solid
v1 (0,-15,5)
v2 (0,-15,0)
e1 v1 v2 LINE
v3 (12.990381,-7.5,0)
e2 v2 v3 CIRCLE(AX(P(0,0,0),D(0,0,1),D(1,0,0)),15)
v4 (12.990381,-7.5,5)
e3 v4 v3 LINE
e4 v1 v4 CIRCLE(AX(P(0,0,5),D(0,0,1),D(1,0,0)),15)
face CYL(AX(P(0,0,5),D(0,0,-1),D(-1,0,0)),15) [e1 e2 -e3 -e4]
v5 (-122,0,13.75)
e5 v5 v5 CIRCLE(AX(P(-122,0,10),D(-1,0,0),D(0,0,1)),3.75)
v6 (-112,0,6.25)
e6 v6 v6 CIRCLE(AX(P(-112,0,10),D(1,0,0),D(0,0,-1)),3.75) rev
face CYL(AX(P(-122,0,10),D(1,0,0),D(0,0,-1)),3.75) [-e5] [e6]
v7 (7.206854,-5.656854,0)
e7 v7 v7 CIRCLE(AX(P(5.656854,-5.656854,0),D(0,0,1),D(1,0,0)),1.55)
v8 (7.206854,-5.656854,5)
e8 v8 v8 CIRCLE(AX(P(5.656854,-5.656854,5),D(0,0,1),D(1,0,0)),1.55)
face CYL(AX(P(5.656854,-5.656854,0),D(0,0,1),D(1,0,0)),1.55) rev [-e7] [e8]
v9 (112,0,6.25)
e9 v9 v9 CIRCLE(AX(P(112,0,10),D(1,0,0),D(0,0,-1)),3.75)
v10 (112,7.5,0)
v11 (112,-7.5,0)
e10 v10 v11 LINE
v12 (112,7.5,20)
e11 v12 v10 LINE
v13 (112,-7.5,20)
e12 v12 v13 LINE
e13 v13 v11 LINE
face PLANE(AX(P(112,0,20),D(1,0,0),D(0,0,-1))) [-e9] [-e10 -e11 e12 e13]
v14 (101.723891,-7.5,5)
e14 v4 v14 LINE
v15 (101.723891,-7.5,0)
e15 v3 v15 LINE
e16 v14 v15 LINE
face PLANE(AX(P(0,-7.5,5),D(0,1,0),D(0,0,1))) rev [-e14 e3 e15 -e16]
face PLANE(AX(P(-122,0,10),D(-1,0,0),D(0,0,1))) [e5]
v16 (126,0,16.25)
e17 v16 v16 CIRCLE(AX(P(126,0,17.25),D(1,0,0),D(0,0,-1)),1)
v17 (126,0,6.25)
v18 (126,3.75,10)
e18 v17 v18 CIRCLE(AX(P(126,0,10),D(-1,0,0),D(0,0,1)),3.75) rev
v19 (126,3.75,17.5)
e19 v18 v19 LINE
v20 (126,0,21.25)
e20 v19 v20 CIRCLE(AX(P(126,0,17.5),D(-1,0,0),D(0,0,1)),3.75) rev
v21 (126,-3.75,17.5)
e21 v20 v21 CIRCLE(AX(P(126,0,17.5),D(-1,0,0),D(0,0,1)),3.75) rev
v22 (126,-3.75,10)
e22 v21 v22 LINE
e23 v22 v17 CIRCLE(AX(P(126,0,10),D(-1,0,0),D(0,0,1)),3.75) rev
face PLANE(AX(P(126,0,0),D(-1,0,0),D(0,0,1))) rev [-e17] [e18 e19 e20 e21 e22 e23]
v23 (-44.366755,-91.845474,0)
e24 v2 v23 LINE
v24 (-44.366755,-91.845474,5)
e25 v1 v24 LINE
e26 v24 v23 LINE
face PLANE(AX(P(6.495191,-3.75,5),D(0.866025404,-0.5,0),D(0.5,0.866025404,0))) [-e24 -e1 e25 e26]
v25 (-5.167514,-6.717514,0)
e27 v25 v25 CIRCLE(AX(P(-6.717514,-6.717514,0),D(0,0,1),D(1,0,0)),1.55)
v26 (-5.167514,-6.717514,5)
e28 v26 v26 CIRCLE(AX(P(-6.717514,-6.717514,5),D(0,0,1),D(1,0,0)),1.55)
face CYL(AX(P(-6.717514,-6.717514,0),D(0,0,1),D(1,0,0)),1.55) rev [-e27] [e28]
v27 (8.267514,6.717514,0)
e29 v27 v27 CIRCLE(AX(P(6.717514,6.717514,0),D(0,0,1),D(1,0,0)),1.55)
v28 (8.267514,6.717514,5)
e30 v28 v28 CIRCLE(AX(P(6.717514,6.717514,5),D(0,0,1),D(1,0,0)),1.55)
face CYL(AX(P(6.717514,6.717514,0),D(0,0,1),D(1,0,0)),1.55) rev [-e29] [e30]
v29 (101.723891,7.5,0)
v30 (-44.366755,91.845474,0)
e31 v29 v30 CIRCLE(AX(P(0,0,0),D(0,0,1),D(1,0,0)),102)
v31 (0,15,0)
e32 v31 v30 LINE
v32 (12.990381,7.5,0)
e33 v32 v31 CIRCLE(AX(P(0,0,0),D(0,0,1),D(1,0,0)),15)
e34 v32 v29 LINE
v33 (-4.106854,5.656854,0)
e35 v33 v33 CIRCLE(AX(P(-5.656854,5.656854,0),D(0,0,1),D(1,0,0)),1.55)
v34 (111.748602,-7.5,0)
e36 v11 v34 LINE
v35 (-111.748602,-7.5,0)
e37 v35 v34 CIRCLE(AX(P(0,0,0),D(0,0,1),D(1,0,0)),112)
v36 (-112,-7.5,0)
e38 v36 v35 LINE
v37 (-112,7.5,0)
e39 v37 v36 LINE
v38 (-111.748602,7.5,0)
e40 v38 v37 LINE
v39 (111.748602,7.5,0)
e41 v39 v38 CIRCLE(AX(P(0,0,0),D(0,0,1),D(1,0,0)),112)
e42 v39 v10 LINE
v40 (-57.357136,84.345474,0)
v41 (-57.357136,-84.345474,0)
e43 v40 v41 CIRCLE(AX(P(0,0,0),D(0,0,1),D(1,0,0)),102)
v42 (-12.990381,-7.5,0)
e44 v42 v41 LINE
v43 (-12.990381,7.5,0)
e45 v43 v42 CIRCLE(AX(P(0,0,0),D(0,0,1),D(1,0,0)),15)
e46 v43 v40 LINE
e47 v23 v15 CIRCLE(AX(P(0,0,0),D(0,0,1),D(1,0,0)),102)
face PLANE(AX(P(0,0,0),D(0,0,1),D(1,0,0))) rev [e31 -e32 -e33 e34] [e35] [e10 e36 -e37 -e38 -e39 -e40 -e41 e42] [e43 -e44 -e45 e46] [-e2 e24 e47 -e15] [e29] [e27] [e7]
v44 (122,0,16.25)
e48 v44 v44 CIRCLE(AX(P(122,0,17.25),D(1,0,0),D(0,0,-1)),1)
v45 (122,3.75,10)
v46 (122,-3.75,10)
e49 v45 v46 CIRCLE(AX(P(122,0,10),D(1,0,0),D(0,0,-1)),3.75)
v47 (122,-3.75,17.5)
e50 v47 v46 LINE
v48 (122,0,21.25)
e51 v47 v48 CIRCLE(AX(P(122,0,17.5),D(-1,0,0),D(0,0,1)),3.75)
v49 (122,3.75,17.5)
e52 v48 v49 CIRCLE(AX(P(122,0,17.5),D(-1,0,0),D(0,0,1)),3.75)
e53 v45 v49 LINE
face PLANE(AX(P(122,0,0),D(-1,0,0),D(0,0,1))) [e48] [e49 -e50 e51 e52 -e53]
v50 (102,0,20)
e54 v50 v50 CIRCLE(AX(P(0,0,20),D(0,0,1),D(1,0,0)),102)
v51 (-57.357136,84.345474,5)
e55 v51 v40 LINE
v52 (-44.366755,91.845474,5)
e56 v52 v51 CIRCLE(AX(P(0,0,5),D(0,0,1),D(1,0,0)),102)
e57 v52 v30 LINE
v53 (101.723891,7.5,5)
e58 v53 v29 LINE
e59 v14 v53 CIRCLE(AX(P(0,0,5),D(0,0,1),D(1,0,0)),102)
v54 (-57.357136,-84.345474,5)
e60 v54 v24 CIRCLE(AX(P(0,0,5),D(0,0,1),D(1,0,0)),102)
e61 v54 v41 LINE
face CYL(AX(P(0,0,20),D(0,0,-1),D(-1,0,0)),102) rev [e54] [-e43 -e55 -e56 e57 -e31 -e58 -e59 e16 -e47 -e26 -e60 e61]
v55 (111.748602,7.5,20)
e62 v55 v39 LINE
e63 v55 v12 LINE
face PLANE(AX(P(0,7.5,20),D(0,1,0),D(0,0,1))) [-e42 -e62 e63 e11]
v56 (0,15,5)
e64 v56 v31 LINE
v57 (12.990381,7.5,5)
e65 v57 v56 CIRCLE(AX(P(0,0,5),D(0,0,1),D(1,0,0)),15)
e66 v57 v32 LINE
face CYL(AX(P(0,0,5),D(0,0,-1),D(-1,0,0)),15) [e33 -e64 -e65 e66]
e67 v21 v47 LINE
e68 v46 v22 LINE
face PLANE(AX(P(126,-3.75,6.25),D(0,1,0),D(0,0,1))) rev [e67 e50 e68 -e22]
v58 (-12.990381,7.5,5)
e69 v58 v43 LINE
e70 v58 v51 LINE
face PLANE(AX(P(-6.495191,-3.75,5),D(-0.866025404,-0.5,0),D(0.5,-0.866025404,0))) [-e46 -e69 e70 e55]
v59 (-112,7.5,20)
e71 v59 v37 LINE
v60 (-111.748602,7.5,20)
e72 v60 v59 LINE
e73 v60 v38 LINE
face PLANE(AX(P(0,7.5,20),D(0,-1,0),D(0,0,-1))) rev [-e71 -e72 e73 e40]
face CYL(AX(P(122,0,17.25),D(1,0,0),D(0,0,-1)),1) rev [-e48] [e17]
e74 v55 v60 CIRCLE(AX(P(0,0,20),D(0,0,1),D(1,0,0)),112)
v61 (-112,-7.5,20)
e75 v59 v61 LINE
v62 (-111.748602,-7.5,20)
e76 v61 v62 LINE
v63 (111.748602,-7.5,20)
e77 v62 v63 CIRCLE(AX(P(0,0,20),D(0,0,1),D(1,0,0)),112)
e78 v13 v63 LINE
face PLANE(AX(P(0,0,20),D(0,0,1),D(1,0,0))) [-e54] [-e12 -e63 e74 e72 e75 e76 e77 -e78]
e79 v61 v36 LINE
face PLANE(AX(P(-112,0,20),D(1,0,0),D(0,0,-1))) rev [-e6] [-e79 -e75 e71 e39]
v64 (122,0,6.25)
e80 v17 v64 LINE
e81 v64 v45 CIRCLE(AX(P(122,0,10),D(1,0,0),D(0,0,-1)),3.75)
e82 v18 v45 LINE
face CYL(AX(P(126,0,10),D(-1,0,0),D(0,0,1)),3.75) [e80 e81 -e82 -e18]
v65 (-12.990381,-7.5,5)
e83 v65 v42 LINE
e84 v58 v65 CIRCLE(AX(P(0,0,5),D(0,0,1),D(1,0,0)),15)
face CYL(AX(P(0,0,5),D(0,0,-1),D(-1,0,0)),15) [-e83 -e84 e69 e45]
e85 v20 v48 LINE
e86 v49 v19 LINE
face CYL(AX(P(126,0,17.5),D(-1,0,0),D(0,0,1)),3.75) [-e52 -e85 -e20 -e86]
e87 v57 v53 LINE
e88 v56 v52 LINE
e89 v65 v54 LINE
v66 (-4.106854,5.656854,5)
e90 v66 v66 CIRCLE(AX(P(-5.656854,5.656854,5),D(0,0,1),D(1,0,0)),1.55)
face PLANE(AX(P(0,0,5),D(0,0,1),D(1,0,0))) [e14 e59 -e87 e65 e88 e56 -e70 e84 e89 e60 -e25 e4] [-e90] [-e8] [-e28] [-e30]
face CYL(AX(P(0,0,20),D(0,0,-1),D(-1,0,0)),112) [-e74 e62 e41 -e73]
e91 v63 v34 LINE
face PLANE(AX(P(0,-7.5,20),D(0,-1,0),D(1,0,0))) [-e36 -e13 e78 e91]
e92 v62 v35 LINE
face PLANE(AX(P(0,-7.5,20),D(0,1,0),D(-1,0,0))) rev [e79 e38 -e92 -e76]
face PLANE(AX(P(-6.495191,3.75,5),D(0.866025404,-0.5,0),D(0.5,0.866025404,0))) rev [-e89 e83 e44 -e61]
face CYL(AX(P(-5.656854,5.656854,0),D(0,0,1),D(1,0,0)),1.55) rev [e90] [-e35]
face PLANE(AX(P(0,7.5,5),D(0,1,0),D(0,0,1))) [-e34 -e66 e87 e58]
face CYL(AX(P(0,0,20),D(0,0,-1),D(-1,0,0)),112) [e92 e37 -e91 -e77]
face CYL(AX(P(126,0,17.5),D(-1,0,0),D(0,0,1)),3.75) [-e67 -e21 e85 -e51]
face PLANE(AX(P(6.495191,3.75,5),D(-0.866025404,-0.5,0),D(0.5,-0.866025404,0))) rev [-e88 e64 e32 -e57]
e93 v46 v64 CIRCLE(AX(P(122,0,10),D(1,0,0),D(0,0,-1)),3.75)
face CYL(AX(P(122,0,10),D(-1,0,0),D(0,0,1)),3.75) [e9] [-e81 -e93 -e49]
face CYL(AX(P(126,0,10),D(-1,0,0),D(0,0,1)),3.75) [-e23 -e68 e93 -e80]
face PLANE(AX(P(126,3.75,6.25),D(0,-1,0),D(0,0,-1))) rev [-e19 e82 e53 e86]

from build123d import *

# Parameters (mm, degrees)
BOSS_EXTRUDE1_DEPTH = 20
SKETCH1_3_R         = 15
BOSS_EXTRUDE2_DEPTH = 5
SKETCH2_R           = 1.55
CUT_EXTRUDE1_DEPTH  = 5
SKETCH4_R           = 3.75
BOSS_EXTRUDE3_DEPTH = 10
BOSS_EXTRUDE4_START = 10
SKETCH3_R           = 3.75
BOSS_EXTRUDE4_DEPTH = 10
SKETCH5_W           = 15
SKETCH5_H           = 7.5
BOSS_EXTRUDE5_DEPTH = 4
FILLET2_R           = 3.75
SKETCH6_R           = 1
CUT_EXTRUDE2_DEPTH  = 4


with BuildPart() as part:
    # Sketch1 → Boss-Extrude1 (new body)
    with BuildSketch(Plane.XY):
        with BuildLine():
            Line((112, 7.5), (111.748601781, 7.5))
            ThreePointArc((111.748601781, 7.5), (0, 112), (-111.748601781, 7.5))
            Line((-111.748601781, 7.5), (-112, 7.5))
            Line((-112, 7.5), (-112, -7.5))
            Line((-112, -7.5), (-111.748601781, -7.5))
            ThreePointArc((-111.748601781, -7.5), (0, -112), (111.748601781, -7.5))
            Line((111.748601781, -7.5), (112, -7.5))
            Line((112, -7.5), (112, 7.5))
        make_face()
        with BuildLine():
            ThreePointArc((102, 0), (101.930949377, -3.752540346), (101.723890999, -7.5))
            ThreePointArc((101.723890999, -7.5), (51, -88.334591186), (-44.366754971, -91.845473777))
            ThreePointArc((-44.366754971, -91.845473777), (-51, -88.334591186), (-57.357136028, -84.345473777))
            ThreePointArc((-57.357136028, -84.345473777), (-102, 0), (-57.357136028, 84.345473777))
            ThreePointArc((-57.357136028, 84.345473777), (-51, 88.334591186), (-44.366754971, 91.845473777))
            ThreePointArc((-44.366754971, 91.845473777), (51, 88.334591186), (101.723890999, 7.5))
            ThreePointArc((101.723890999, 7.5), (101.930949377, 3.752540346), (102, 0))
        make_face(mode=Mode.SUBTRACT)
    extrude(amount=BOSS_EXTRUDE1_DEPTH)

    # Sketch1<3> → Boss-Extrude2 (add)
    with BuildSketch(Plane.XY):
        with BuildLine():
            Line((-57.357136028, 84.345473777), (-12.990381057, 7.5))
            ThreePointArc((-12.990381057, 7.5), (-7.5, 12.990381057), (0, 15))
            Line((0, 15), (-44.366754971, 91.845473777))
            ThreePointArc((-44.366754971, 91.845473777), (-51, 88.334591186), (-57.357136028, 84.345473777))
        make_face()
        Circle(SKETCH1_3_R)
        with BuildLine():
            Line((-44.366754971, -91.845473777), (0, -15))
            ThreePointArc((0, -15), (-7.5, -12.990381057), (-12.990381057, -7.5))
            Line((-12.990381057, -7.5), (-57.357136028, -84.345473777))
            ThreePointArc((-57.357136028, -84.345473777), (-51, -88.334591186), (-44.366754971, -91.845473777))
        make_face()
        with BuildLine():
            ThreePointArc((15, 0), (14.488887394, -3.882285677), (12.990381057, -7.5))
            Line((12.990381057, -7.5), (101.723890999, -7.5))
            ThreePointArc((101.723890999, -7.5), (101.930949377, -3.752540346), (102, 0))
            ThreePointArc((102, 0), (101.930949377, 3.752540346), (101.723890999, 7.5))
            Line((101.723890999, 7.5), (12.990381057, 7.5))
            ThreePointArc((12.990381057, 7.5), (14.488887394, 3.882285677), (15, 0))
        make_face()
    extrude(amount=BOSS_EXTRUDE2_DEPTH)

    # Sketch2 → Cut-Extrude1 (cut)
    with BuildSketch(Plane.XY.offset(5)):
        with Locations((-5.656854249, 5.656854249)):
            Circle(SKETCH2_R)
        with Locations((6.717514421, 6.717514421)):
            Circle(SKETCH2_R)
        with Locations((5.656854249, -5.656854249)):
            Circle(SKETCH2_R)
        with Locations((-6.717514421, -6.717514421)):
            Circle(SKETCH2_R)
    extrude(amount=-CUT_EXTRUDE1_DEPTH, mode=Mode.SUBTRACT)

    # Sketch4 → Boss-Extrude3 (add)
    with BuildSketch(Plane.ZY.offset(112)):
        with Locations(Location((10, 0, 0), (0, 0, 180))):
            Circle(SKETCH4_R)
    extrude(amount=BOSS_EXTRUDE3_DEPTH)

    # Sketch3 → Boss-Extrude4 (add)
    with BuildSketch(Plane(origin=(112, 0, 0), x_dir=(0, 0, -1), z_dir=(1, 0, 0)).offset(BOSS_EXTRUDE4_START)):
        with Locations((-10, 0)):
            Circle(SKETCH3_R)
    extrude(amount=-BOSS_EXTRUDE4_DEPTH)

    # Sketch5 → Boss-Extrude5 (add)
    with BuildSketch(Plane(origin=(122, 0, 0), x_dir=(0, 0, -1), z_dir=(1, 0, 0))):
        with Locations((-13.75, 0)):
            Rectangle(SKETCH5_W, SKETCH5_H)
    extrude(amount=BOSS_EXTRUDE5_DEPTH)

    # Fillet2
    fillet2_edges = [part.edges().sort_by_distance(p)[0] for p in [
        (124, -3.75, 21.25),
        (124, 3.75, 21.25),
        (124, 3.75, 6.25),
        (124, -3.75, 6.25),
    ]]
    fillet(fillet2_edges, radius=FILLET2_R - 0.0001)  # a hair under: the kernel refuses the full size

    # Sketch6 → Cut-Extrude2 (cut)
    with BuildSketch(Plane(origin=(126, 0, 0), x_dir=(0, 0, -1), z_dir=(1, 0, 0))):
        with Locations((-17.25, 0)):
            Circle(SKETCH6_R)
    extrude(amount=-CUT_EXTRUDE2_DEPTH, mode=Mode.SUBTRACT)


solid = part.part
